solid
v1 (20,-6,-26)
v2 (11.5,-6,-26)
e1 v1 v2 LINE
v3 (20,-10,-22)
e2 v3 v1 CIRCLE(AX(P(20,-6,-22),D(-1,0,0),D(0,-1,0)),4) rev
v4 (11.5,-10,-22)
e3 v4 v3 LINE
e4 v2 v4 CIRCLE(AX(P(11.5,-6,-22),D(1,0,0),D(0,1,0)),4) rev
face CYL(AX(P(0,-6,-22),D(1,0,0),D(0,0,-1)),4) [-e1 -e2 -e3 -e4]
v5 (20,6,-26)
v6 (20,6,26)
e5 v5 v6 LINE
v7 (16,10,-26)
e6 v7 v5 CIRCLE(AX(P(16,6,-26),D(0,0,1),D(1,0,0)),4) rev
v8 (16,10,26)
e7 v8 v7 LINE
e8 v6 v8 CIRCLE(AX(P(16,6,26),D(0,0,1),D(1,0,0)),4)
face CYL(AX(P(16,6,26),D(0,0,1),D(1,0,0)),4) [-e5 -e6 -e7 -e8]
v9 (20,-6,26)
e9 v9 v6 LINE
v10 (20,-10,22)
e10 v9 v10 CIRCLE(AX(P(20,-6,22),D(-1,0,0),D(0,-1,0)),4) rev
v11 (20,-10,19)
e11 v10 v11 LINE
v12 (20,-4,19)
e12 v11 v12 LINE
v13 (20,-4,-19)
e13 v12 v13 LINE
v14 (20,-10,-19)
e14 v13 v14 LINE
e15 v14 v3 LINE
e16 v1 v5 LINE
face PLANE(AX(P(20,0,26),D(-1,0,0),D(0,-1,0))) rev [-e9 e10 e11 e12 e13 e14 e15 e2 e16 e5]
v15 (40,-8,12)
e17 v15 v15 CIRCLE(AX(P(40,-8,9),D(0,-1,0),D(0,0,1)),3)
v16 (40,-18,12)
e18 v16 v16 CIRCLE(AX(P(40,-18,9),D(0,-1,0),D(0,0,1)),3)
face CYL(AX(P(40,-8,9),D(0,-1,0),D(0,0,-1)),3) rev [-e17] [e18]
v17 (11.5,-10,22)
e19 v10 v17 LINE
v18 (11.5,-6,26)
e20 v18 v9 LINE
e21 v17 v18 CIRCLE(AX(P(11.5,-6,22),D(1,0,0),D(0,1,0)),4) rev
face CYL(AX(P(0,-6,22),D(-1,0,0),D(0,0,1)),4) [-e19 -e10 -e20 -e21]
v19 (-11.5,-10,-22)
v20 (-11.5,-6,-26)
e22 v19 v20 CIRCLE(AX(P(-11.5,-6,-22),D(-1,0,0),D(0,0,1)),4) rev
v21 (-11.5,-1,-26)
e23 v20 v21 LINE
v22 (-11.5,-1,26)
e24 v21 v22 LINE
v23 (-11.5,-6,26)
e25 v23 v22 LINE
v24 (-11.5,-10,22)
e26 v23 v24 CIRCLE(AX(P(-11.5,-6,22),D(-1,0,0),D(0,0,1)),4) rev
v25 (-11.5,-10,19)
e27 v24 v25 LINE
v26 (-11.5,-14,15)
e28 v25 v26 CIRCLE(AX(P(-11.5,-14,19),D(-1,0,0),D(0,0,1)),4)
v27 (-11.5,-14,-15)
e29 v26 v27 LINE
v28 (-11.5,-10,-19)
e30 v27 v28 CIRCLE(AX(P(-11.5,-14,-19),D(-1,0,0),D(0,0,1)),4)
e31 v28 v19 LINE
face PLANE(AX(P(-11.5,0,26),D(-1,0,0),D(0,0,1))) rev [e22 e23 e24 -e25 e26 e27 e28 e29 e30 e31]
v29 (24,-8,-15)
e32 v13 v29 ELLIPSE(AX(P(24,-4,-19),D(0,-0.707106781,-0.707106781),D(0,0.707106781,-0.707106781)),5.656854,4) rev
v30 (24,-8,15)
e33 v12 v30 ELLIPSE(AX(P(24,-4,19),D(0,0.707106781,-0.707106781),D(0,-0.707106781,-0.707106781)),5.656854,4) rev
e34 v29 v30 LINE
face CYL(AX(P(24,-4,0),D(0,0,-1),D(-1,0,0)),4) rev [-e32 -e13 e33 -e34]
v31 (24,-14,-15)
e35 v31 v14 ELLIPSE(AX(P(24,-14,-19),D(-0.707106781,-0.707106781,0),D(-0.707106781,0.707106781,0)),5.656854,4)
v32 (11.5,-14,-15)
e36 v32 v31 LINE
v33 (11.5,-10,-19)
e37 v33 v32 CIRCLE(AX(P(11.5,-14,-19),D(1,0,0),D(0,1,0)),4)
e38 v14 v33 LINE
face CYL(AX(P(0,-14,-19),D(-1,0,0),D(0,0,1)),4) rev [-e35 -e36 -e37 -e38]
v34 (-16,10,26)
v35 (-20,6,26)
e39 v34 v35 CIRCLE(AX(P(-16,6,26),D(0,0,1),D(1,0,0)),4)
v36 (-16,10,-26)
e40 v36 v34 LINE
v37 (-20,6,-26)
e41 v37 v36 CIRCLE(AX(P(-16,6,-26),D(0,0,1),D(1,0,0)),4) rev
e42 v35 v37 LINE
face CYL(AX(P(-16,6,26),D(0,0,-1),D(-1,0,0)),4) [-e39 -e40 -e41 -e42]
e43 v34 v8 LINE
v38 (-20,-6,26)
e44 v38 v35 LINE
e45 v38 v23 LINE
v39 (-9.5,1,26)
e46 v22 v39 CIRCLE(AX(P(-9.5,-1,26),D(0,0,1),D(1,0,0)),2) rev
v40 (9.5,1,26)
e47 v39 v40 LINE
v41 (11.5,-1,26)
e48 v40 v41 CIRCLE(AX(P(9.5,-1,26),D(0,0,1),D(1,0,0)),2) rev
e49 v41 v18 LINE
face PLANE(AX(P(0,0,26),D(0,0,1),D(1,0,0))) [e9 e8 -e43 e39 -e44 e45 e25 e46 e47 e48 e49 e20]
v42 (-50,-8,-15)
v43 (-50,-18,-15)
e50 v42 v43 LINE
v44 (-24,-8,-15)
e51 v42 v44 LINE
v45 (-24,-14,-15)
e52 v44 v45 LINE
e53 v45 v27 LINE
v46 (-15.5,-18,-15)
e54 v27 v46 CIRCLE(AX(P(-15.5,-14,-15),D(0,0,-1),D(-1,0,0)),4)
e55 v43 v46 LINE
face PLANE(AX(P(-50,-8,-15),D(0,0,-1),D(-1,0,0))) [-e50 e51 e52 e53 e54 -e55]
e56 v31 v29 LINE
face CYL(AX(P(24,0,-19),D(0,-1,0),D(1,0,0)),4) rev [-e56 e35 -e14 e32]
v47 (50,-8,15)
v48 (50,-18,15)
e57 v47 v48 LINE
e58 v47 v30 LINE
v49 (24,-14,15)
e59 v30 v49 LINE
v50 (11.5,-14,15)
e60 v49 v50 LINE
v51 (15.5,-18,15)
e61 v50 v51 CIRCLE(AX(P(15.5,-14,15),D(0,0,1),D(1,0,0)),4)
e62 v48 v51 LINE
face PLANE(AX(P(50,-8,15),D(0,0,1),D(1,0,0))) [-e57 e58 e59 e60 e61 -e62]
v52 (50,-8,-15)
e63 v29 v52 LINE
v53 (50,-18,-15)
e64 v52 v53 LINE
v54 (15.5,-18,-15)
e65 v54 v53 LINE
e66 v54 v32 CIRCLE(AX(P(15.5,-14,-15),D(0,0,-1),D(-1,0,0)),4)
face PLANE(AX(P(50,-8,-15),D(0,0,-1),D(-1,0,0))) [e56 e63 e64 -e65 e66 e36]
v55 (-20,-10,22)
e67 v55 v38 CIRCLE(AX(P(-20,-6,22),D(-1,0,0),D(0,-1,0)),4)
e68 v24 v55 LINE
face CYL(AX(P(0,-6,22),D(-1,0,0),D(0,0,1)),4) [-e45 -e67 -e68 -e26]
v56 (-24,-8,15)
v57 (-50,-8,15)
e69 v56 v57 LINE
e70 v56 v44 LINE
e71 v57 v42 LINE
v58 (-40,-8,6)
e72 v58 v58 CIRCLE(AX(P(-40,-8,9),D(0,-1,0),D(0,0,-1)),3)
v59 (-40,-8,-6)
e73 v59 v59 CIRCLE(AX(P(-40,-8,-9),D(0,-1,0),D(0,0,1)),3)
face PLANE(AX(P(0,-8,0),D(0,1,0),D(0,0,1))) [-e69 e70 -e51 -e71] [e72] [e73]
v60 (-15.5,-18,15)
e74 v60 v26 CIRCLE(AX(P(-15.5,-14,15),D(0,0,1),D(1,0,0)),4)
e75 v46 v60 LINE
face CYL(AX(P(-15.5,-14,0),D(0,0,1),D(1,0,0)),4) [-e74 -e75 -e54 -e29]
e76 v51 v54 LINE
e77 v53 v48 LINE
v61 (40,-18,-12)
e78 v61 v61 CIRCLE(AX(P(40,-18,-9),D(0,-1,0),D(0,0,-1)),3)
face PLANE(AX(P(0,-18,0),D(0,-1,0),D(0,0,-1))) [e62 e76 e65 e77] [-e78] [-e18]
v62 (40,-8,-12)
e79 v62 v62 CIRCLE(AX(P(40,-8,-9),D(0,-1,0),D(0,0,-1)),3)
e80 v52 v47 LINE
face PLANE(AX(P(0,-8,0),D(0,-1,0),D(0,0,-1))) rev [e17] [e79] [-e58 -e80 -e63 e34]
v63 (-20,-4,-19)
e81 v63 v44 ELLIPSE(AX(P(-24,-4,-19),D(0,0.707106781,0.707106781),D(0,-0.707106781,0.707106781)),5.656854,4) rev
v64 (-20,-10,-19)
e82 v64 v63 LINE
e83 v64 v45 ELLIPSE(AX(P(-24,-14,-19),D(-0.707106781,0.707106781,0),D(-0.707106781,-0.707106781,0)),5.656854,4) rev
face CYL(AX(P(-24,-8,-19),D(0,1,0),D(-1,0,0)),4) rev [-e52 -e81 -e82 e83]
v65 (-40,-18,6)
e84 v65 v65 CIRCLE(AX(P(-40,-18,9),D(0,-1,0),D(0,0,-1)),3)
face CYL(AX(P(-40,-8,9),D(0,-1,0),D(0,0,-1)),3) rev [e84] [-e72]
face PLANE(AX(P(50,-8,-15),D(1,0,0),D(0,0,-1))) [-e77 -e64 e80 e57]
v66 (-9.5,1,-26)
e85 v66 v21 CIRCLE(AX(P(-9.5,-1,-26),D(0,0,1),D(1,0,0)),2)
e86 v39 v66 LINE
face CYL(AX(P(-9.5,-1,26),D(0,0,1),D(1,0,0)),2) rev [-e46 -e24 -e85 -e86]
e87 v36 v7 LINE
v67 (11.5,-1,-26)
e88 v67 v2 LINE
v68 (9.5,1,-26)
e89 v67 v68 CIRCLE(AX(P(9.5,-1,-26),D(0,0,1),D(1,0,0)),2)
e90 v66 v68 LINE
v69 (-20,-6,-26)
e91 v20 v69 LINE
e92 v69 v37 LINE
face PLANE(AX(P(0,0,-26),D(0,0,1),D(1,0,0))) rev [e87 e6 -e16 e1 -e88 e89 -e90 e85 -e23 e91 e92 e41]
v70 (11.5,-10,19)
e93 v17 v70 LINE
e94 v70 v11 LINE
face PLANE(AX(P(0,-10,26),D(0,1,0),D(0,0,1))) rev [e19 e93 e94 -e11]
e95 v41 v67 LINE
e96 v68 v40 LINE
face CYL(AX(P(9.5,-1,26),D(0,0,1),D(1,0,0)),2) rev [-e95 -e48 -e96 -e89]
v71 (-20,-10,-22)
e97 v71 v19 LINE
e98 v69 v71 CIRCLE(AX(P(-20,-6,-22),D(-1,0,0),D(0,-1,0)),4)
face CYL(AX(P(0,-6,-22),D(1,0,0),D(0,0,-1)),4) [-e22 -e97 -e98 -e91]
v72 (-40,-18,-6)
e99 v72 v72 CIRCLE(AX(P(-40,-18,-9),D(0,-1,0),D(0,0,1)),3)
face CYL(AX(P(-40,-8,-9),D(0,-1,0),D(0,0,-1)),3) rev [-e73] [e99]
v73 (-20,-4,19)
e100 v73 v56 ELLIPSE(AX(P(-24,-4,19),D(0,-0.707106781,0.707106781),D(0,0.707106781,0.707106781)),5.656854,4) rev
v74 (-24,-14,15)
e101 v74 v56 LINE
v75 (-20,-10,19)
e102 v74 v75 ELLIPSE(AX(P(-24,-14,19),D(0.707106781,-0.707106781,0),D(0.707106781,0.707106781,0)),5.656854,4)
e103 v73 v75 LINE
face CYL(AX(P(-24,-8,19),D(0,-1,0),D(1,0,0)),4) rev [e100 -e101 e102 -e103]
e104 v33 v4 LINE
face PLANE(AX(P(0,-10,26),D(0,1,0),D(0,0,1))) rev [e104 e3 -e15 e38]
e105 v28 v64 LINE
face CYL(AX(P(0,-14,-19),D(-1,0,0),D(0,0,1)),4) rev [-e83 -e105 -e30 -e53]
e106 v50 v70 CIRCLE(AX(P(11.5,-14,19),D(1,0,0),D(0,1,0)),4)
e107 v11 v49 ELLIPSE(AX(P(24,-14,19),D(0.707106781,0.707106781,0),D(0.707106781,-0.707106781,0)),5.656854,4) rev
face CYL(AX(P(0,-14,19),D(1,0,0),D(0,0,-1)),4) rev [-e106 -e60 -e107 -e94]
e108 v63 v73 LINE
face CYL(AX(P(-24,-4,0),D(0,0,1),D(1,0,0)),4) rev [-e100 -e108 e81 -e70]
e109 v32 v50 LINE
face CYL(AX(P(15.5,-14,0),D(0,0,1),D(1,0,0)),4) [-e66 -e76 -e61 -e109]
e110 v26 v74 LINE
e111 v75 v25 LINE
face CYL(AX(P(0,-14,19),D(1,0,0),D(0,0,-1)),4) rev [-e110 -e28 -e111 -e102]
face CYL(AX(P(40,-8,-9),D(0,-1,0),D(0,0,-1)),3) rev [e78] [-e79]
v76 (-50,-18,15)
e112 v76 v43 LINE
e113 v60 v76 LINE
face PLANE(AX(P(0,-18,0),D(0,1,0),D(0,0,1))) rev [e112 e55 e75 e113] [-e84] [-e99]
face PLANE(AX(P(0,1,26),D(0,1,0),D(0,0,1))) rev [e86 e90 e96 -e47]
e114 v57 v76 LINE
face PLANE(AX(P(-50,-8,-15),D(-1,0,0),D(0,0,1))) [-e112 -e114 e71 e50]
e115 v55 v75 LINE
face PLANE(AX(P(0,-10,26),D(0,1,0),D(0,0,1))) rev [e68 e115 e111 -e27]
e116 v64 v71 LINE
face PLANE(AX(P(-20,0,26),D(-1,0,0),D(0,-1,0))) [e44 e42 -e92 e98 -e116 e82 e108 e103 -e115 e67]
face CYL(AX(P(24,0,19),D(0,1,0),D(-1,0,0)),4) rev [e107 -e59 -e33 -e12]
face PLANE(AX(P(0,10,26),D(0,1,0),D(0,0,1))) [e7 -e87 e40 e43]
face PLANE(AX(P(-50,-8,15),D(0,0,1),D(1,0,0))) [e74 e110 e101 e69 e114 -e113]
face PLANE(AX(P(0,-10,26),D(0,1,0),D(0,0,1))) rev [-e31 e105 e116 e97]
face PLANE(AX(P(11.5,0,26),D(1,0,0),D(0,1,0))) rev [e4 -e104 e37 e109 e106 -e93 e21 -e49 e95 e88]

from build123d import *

# Parameters (mm, degrees)
EXTRUDE_1_DEPTH      = 26
EXTRUDE_2_DEPTH      = 8
EXTRUDE_2_DEPTH_BACK = 2
SKETCH_2_W           = 38.5
SKETCH_2_H           = 30
SKETCH_2_R           = 3
FILLET_1_R           = 4
FILLET_2_R           = 4
FILLET_3_R           = 2


with BuildPart() as part:
    # 草圖1 → 填料-伸長1 (new, symmetric)
    with BuildSketch(Plane.XY):
        Polygon((11.5, 1), (11.5, -10), (20, -10), (20, 10), (-20, 10), (-20, -10), (-11.5, -10), (-11.5, 1), align=None)
    extrude(amount=EXTRUDE_1_DEPTH, both=True)

    # 草圖2 → 填料-伸長2 (add, two sides: drawn at the far end of the back side and taken through both)
    # profile 1 of 2: a face of its own
    with BuildSketch(Plane.XZ.offset(10).offset(-EXTRUDE_2_DEPTH_BACK)):
        with Locations((-30.75, 0)):
            Rectangle(SKETCH_2_W, SKETCH_2_H)
        with Locations(Location((-40, 9, 0), (0, 0, 270))):
            Circle(SKETCH_2_R, mode=Mode.SUBTRACT)
        with Locations(Location((-40, -9, 0), (0, 0, 90))):
            Circle(SKETCH_2_R, mode=Mode.SUBTRACT)
    # profile 2 of 2: a face of its own
    with BuildSketch(Plane.XZ.offset(10).offset(-EXTRUDE_2_DEPTH_BACK)):
        with Locations((30.75, 0)):
            Rectangle(SKETCH_2_W, SKETCH_2_H)
        with Locations(Location((40, 9, 0), (0, 0, 90))):
            Circle(SKETCH_2_R, mode=Mode.SUBTRACT)
        with Locations(Location((40, -9, 0), (0, 0, 270))):
            Circle(SKETCH_2_R, mode=Mode.SUBTRACT)
    extrude(amount=EXTRUDE_2_DEPTH + EXTRUDE_2_DEPTH_BACK)

    # 圓角1
    fillet_1_edges = [part.edges().sort_by_distance(p)[0] for p in [
        (20, 10, 0),
        (-20, 10, 0),
        (-11.5, -18, 0),
        (-20, -8, 0),
        (-15.75, -10, -15),
        (15.75, -10, -15),
        (-15.75, -10, 15),
        (15.75, -10, 15),
        (20, -8, 0),
        (11.5, -18, 0),
        (-20, -9, 15),
        (-20, -9, -15),
        (20, -9, -15),
        (20, -9, 15),
    ]]
    fillet(fillet_1_edges, radius=FILLET_1_R - 0.0001)  # a hair under: the kernel refuses the full size

    # 圓角2
    fillet_2_edges = [part.edges().sort_by_distance(p)[0] for p in [
        (-15.75, -10, -26),
        (15.75, -10, 26),
        (15.75, -10, -26),
        (-15.75, -10, 26),
    ]]
    fillet(fillet_2_edges, radius=FILLET_2_R)

    # 圓角3
    fillet_3_edges = [part.edges().sort_by_distance(p)[0] for p in [
        (11.5, 1, 0),
        (-11.5, 1, 0),
    ]]
    fillet(fillet_3_edges, radius=FILLET_3_R)


solid = part.part
